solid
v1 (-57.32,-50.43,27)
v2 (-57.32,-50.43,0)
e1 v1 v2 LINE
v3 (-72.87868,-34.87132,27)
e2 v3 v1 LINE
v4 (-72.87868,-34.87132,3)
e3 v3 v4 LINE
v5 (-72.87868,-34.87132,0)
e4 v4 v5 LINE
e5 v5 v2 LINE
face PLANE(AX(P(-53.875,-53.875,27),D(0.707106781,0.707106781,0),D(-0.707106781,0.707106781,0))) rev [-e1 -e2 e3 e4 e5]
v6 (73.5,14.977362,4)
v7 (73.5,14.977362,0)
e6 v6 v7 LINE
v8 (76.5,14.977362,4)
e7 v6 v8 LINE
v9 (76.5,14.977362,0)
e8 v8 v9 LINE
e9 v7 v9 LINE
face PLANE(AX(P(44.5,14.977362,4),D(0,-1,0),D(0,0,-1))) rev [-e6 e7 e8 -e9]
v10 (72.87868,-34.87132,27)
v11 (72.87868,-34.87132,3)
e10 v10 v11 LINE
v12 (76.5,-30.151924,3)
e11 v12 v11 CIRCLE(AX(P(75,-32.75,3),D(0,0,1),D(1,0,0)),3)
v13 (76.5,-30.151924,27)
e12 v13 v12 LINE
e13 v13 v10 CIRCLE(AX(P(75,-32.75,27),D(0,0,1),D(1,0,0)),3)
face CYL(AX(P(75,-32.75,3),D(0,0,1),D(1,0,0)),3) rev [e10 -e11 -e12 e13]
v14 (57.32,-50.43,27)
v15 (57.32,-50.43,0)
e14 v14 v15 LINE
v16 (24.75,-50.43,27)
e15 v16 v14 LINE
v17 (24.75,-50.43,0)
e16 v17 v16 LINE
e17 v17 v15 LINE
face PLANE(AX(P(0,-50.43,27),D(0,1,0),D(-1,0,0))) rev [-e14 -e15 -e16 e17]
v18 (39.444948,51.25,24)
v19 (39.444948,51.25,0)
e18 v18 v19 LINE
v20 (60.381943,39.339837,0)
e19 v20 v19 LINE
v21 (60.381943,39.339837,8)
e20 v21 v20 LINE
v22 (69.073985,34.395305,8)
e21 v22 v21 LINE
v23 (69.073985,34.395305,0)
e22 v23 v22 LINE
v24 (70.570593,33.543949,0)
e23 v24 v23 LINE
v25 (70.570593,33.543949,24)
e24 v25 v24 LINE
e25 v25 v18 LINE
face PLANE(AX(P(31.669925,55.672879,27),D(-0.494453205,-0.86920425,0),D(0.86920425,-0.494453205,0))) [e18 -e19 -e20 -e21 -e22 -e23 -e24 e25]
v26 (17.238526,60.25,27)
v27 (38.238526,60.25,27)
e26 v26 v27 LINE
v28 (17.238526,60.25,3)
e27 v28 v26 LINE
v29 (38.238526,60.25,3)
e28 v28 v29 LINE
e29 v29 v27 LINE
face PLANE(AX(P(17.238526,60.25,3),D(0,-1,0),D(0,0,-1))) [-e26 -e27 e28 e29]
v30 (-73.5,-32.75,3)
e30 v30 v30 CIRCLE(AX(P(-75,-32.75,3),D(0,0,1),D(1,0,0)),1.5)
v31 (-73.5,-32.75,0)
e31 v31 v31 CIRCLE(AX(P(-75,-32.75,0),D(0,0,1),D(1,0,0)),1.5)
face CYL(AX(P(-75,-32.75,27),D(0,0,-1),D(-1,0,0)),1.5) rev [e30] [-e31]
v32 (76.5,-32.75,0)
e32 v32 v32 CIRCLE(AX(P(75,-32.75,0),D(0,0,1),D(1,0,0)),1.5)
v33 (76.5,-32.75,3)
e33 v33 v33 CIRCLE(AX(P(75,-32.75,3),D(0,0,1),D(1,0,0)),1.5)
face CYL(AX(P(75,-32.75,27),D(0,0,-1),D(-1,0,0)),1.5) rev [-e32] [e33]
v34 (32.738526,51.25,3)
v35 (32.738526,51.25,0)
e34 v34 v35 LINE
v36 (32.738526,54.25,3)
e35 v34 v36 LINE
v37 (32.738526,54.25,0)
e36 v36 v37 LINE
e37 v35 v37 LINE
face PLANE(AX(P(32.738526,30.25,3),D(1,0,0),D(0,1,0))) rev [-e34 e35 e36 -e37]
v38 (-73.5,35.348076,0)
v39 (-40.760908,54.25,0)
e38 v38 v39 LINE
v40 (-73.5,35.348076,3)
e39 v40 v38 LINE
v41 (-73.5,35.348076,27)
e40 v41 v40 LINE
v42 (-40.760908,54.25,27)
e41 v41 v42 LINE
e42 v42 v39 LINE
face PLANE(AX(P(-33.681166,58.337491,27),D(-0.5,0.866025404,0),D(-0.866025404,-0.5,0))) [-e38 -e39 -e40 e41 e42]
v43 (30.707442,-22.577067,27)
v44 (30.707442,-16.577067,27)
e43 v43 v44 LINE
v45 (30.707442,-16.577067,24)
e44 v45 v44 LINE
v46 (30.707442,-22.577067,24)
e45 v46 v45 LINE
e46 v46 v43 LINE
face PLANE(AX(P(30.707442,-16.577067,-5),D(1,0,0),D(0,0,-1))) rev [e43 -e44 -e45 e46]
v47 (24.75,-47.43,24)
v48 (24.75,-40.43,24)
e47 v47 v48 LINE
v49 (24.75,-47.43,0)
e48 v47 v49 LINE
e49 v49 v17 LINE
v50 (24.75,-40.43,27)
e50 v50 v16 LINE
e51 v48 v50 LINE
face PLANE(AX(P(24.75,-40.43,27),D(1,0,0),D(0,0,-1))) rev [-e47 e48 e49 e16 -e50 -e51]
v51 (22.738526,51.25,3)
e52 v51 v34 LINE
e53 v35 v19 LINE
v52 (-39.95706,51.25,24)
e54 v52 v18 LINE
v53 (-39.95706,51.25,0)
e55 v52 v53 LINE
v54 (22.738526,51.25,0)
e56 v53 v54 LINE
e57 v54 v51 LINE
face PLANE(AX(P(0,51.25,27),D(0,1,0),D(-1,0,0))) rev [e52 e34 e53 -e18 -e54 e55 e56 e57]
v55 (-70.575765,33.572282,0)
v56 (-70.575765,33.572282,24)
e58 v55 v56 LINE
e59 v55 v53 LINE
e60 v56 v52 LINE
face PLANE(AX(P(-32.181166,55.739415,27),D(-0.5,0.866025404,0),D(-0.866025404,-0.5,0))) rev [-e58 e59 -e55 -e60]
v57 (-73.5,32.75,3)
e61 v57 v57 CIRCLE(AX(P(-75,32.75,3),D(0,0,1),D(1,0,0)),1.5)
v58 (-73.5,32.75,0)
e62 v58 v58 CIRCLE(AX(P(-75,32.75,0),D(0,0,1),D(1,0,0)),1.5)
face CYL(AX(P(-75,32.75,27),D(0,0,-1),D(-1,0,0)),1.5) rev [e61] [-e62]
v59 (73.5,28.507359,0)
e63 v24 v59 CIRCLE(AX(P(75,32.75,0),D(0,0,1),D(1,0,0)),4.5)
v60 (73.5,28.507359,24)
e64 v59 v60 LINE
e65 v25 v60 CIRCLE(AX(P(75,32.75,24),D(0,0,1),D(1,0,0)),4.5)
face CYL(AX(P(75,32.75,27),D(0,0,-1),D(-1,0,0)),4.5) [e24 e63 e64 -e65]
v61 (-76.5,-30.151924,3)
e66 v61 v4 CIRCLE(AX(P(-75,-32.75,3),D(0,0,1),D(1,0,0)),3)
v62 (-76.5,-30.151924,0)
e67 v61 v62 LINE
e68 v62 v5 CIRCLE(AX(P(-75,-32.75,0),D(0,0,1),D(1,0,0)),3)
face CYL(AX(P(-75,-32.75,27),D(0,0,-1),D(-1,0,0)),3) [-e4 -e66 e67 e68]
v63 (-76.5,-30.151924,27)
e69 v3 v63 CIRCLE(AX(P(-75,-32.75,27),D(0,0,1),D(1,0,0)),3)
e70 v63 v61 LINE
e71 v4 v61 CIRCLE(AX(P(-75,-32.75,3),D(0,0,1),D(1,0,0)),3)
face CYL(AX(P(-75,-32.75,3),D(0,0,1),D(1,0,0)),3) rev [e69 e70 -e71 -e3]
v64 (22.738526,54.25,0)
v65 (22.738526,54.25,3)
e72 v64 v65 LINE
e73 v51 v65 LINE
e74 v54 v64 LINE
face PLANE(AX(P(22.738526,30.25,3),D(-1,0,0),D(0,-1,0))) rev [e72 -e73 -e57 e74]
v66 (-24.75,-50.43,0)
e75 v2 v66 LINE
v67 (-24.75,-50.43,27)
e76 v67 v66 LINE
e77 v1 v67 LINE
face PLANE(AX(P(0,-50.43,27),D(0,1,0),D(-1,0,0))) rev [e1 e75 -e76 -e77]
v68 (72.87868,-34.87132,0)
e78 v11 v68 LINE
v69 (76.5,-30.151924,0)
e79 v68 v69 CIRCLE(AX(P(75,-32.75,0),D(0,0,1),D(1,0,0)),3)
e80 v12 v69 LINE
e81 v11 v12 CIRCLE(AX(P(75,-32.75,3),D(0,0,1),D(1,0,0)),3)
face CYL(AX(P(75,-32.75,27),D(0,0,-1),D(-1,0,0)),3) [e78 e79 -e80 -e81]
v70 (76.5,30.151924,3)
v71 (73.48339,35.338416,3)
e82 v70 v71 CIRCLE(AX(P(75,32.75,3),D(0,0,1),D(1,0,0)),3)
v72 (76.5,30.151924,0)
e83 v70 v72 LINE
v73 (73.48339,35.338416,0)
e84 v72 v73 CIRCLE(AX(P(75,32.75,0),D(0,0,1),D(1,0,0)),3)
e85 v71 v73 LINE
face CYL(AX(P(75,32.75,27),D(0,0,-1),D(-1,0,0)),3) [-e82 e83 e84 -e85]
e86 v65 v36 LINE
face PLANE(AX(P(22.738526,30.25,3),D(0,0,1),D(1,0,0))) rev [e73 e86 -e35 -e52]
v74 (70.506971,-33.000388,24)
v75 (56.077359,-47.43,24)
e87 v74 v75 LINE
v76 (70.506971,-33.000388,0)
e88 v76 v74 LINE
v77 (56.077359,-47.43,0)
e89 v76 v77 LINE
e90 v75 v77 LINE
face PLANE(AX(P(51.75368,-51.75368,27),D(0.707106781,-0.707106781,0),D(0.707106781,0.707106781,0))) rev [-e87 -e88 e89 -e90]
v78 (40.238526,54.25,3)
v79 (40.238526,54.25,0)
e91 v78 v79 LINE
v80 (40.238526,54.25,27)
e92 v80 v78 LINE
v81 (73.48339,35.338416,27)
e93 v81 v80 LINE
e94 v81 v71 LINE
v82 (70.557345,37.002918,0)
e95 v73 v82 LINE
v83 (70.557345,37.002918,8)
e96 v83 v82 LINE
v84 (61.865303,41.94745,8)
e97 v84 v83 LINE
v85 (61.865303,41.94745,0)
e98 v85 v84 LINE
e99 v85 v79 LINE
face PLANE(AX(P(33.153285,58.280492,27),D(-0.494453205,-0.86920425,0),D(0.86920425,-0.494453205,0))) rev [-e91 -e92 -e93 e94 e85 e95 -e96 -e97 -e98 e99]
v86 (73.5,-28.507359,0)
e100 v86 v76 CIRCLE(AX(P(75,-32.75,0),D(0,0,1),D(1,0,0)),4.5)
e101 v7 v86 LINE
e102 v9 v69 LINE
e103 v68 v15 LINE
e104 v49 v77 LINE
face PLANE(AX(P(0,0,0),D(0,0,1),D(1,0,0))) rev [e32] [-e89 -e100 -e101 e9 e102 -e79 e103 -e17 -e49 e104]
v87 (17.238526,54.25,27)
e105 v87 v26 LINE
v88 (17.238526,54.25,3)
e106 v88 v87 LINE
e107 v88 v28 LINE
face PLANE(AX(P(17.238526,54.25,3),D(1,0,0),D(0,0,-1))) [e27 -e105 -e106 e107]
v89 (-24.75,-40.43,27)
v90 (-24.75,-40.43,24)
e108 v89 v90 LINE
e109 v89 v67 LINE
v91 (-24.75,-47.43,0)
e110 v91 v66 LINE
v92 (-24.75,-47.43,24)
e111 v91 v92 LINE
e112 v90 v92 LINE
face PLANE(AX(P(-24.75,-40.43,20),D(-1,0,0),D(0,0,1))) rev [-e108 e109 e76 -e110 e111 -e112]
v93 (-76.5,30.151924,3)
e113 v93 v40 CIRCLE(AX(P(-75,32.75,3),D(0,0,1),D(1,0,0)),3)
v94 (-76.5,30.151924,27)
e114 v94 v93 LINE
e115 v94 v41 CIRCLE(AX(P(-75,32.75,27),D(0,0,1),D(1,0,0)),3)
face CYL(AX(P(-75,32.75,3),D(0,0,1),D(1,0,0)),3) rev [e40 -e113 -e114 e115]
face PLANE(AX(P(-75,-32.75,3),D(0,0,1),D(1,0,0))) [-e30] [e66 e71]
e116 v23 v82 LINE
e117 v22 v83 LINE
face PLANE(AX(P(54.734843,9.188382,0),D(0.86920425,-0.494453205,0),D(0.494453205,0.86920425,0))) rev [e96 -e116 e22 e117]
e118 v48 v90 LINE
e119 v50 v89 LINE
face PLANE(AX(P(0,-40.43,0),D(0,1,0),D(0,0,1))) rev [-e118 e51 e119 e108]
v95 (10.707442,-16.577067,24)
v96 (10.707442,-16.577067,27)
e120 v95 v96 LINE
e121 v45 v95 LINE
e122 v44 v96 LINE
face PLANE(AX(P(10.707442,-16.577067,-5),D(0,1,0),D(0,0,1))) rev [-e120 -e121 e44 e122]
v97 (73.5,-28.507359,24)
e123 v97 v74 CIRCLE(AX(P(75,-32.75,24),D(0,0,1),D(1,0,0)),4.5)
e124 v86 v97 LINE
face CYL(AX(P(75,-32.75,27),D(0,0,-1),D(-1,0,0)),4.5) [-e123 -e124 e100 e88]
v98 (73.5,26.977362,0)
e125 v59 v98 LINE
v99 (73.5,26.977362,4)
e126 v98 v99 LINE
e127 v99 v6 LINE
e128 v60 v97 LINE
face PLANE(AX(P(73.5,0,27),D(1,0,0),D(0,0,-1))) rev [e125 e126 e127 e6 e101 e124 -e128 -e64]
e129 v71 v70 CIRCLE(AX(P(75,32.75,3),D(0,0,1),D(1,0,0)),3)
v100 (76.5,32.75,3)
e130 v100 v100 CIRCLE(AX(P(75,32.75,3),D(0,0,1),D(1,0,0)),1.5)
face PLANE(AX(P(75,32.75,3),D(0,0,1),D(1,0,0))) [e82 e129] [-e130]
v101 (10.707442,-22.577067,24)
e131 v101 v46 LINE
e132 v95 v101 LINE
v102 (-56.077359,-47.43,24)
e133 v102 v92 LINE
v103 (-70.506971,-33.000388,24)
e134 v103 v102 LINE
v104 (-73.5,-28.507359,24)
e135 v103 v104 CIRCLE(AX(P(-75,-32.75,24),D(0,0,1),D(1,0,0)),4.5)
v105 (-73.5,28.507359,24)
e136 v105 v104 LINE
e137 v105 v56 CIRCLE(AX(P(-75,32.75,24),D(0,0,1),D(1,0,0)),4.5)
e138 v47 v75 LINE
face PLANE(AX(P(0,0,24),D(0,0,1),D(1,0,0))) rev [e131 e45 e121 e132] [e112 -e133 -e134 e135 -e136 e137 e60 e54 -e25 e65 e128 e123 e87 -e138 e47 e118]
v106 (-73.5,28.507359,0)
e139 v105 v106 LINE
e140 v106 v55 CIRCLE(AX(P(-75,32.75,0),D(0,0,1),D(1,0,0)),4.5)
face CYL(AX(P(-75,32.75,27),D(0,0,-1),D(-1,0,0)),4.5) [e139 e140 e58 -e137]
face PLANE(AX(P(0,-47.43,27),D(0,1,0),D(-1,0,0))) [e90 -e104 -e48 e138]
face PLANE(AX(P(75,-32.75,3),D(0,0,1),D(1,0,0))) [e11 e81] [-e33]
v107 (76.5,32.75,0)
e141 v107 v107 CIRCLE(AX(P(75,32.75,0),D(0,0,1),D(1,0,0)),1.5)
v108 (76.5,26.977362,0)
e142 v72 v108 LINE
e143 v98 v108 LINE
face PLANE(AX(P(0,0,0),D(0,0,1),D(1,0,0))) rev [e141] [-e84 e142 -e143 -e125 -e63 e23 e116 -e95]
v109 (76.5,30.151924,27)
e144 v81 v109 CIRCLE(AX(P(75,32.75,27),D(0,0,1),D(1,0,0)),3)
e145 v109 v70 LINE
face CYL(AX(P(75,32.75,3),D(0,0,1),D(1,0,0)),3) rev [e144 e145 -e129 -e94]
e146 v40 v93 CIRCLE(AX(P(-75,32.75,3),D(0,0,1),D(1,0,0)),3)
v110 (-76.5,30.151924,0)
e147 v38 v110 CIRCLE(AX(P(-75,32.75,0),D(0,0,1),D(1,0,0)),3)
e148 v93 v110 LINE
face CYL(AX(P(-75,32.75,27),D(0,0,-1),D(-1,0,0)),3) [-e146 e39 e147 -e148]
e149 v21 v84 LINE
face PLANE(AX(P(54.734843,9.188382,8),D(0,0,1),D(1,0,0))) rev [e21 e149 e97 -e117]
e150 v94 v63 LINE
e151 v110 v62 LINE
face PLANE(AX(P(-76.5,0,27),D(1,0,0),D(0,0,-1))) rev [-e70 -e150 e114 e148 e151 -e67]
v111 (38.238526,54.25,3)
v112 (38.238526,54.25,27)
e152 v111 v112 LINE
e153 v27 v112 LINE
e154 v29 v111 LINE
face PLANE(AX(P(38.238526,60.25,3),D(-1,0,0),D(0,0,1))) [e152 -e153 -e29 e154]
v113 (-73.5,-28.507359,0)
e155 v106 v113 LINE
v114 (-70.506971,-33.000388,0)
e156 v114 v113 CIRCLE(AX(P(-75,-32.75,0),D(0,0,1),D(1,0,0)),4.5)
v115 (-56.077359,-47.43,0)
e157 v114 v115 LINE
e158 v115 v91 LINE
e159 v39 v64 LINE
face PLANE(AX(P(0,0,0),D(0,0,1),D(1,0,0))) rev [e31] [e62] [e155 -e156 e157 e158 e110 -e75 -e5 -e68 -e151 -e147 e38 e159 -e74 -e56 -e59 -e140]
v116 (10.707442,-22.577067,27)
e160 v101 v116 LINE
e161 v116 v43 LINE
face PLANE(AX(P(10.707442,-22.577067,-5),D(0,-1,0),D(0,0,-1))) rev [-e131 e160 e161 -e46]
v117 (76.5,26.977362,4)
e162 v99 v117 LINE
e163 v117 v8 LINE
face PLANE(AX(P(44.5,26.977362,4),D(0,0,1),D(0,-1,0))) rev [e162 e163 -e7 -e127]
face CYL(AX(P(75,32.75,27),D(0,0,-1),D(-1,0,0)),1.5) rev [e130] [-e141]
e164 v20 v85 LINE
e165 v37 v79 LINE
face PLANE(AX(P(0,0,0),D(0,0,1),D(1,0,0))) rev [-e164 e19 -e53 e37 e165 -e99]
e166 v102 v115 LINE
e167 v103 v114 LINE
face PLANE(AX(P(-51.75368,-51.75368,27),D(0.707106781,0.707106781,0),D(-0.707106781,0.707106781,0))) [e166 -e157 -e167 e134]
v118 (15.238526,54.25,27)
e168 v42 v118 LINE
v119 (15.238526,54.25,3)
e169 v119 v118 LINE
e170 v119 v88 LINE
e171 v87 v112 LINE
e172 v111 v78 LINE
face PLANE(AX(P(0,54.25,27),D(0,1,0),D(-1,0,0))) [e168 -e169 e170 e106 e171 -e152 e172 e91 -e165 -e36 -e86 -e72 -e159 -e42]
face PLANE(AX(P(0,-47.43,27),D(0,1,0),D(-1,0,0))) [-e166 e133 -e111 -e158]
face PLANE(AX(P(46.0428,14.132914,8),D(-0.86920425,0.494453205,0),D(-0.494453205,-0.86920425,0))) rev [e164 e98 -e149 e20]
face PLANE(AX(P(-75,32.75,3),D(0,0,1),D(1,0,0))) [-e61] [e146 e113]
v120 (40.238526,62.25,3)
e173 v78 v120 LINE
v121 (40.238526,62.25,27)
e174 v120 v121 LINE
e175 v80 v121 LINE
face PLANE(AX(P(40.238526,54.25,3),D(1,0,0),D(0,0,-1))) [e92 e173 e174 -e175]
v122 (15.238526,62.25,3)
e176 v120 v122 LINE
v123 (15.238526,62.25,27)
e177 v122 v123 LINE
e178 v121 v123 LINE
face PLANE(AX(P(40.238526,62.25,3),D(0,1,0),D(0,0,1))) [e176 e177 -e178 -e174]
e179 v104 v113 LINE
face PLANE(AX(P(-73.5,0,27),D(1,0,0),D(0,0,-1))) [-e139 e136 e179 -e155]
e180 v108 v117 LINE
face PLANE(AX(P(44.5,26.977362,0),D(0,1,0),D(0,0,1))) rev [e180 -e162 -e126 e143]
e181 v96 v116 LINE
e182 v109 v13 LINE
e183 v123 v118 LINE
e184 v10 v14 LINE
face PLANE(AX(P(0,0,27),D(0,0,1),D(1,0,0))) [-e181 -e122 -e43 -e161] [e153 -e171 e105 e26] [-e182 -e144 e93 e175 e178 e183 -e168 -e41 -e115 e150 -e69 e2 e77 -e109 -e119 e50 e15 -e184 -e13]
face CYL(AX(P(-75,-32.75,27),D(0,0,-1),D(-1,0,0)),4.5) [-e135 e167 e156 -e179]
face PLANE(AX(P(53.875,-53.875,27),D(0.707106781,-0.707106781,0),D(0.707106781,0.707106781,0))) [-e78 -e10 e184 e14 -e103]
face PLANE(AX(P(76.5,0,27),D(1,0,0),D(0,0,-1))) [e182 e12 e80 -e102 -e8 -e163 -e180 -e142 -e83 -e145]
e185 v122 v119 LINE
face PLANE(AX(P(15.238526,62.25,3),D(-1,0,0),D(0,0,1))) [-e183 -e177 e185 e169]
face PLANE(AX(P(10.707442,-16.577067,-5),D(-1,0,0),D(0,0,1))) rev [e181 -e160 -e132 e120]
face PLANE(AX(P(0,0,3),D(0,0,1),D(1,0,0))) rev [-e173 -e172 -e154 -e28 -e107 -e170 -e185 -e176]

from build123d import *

# Parameters (mm, degrees)
SKETCH_2_R          = 1.5
EXTRUDE_1_DEPTH     = 27
SHELL_1_DEPTH       = 24
CUT_EXTRUDE_START   = -24
SKETCH_3_R          = 3
CUT_EXTRUDE_1_DEPTH = 24
SKETCH_5_W          = 20
SKETCH_5_H          = 6
CUT_EXTRUDE_3_DEPTH = 32
SKETCH_6_W          = 4
SKETCH_6_H          = 12
CUT_EXTRUDE_4_DEPTH = 32
SKETCH_7_W          = 10
SKETCH_7_H          = 8
CUT_EXTRUDE_5_DEPTH = 32
EXTRUDE_2_DEPTH     = 24
SKETCH_9_W          = 10
SKETCH_9_H          = 3
CUT_EXTRUDE_6_DEPTH = 24
SKETCH_10_R         = 1.35
CUT_EXTRUDE_7_DEPTH = 10
CUT_EXTRUDE_8_DEPTH = 10
CUT_EXTRUDE_9_DEPTH = 10


# Read off the part's stored shape, not the designer's step: 抽壳1
with BuildPart() as part:
    # 草图2 → 凸台-拉伸1 (new body)
    with BuildSketch(Plane.XY):
        with BuildLine():
            Line((-76.5, 30.151923789), (-76.5, -30.151923789))
            ThreePointArc((-76.5, -30.151923789), (-77.380060021, -34.576284287), (-72.878679656, -34.871320344))
            Line((-72.878679656, -34.871320344), (-57.32, -50.43))
            Line((-57.32, -50.43), (57.32, -50.43))
            Line((57.32, -50.43), (72.878679656, -34.871320344))
            ThreePointArc((72.878679656, -34.871320344), (77.380060021, -34.576284287), (76.5, -30.151923789))
            Line((76.5, -30.151923789), (76.5, 30.151923789))
            ThreePointArc((76.5, 30.151923789), (77.593259199, 34.258312544), (73.483390382, 35.33841559))
            Line((73.483390382, 35.33841559), (40.238526366, 54.25))
            Line((40.238526366, 54.25), (-40.760907637, 54.25))
            Line((-40.760907637, 54.25), (-73.5, 35.348076211))
            ThreePointArc((-73.5, 35.348076211), (-77.598076211, 34.25), (-76.5, 30.151923789))
        make_face()
        with Locations((-75, 32.75)):
            Circle(SKETCH_2_R, mode=Mode.SUBTRACT)
        with Locations((75, 32.75)):
            Circle(SKETCH_2_R, mode=Mode.SUBTRACT)
        with Locations((75, -32.75)):
            Circle(SKETCH_2_R, mode=Mode.SUBTRACT)
        with Locations((-75, -32.75)):
            Circle(SKETCH_2_R, mode=Mode.SUBTRACT)
    extrude(amount=EXTRUDE_1_DEPTH)

    # 抽壳1 outline → 抽壳1 (cut)
    with BuildSketch(Plane.XY):
        with BuildLine():
            Line((-73.5, 28.507359313), (-73.5, -28.507359313))
            ThreePointArc((-73.5, -28.507359313), (-71.254879923, -30.255190266), (-70.506971411, -33.000387902))
            Line((-70.506971411, -33.000387902), (-56.077359313, -47.43))
            Line((-56.077359313, -47.43), (56.077359313, -47.43))
            Line((56.077359313, -47.43), (70.506971411, -33.000387902))
            ThreePointArc((70.506971411, -33.000387902), (71.254879923, -30.255190266), (73.5, -28.507359313))
            Line((73.5, -28.507359313), (73.5, 28.507359313))
            ThreePointArc((73.5, 28.507359313), (71.110106029, 30.48754008), (70.570593139, 33.543948905))
            Line((70.570593139, 33.543948905), (39.444948236, 51.25))
            Line((39.444948236, 51.25), (-39.95706006, 51.25))
            Line((-39.95706006, 51.25), (-70.575765386, 33.572282238))
            ThreePointArc((-70.575765386, 33.572282238), (-71.102885683, 30.5), (-73.5, 28.507359313))
        make_face()
    extrude(amount=SHELL_1_DEPTH, mode=Mode.SUBTRACT)

    # 草图3 → 切除-拉伸1 (cut)
    with BuildSketch(Plane.XY.offset(27).offset(CUT_EXTRUDE_START)):
        with Locations((75, 32.75)):
            Circle(SKETCH_3_R)
        with Locations((75, -32.75)):
            Circle(SKETCH_3_R)
        with Locations((-75, -32.75)):
            Circle(SKETCH_3_R)
        with Locations((-75, 32.75)):
            Circle(SKETCH_3_R)
    extrude(amount=CUT_EXTRUDE_1_DEPTH, mode=Mode.SUBTRACT)

    # 草图5 → 切除-拉伸3 (cut)
    with BuildSketch(Plane.XY.offset(27)):
        with Locations((20.7074416, -19.577067137)):
            Rectangle(SKETCH_5_W, SKETCH_5_H)
    extrude(amount=-CUT_EXTRUDE_3_DEPTH, mode=Mode.SUBTRACT)

    # 草图6 → 切除-拉伸4 (cut)
    with BuildSketch(Plane(origin=(76.5, 0, 0), x_dir=(0, 0, -1), z_dir=(1, 0, 0))):
        with Locations((-2, 20.977362477)):
            Rectangle(SKETCH_6_W, SKETCH_6_H)
    extrude(amount=-CUT_EXTRUDE_4_DEPTH, mode=Mode.SUBTRACT)

    # 草图7 → 切除-拉伸5 (cut)
    with BuildSketch(Plane(origin=(33.153284591, 58.280491682, 0), x_dir=(0.8692042501767389, -0.4944532045347601, 0), z_dir=(0.4944532045347601, 0.8692042501767389, 0))):
        with Locations((38.03253292, -4)):
            Rectangle(SKETCH_7_W, SKETCH_7_H)
    extrude(amount=-CUT_EXTRUDE_5_DEPTH, mode=Mode.SUBTRACT)

    # 草图8 → 凸台-拉伸2 (add)
    with BuildSketch(Plane.XY.offset(27)):
        Polygon((40.238526366, 54.25), (40.238526366, 62.25), (15.238526366, 62.25), (15.238526366, 54.25), (17.238526366, 54.25), (17.238526366, 60.25), (38.238526366, 60.25), (38.238526366, 54.25), align=None)
    extrude(amount=-EXTRUDE_2_DEPTH)

    # 草图9 → 切除-拉伸6 (cut)
    with BuildSketch(Plane(origin=(0, 54.25, 0), x_dir=(1, 0, 0), z_dir=(0, 1, 0))):
        with Locations((27.738526366, -1.5)):
            Rectangle(SKETCH_9_W, SKETCH_9_H)
    extrude(amount=-CUT_EXTRUDE_6_DEPTH, mode=Mode.SUBTRACT)

    # 草图10 → 切除-拉伸7 (cut)
    with BuildSketch(Plane.XZ.offset(50.43)):
        with Locations((-18.75, 20)):
            Circle(SKETCH_10_R)
        with Locations((18.75, 20)):
            Circle(SKETCH_10_R)
    extrude(amount=-CUT_EXTRUDE_7_DEPTH, mode=Mode.SUBTRACT)

    # 草图11 → 切除-拉伸8 (cut)
    with BuildSketch(Plane.XZ.offset(50.43)):
        Polygon((0, 3), (2, 3), (2, 0), (-2, 0), (-2, 3), align=None)
    extrude(amount=-CUT_EXTRUDE_8_DEPTH, mode=Mode.SUBTRACT)

    # 草图12 → 切除-拉伸9 (cut)
    with BuildSketch(Plane.XZ.offset(50.43)):
        Polygon((-24.75, 20), (-24.75, 27), (24.75, 27), (24.75, 20), (24.75, 0), (-24.75, 0), align=None)
    extrude(amount=-CUT_EXTRUDE_9_DEPTH, mode=Mode.SUBTRACT)


solid = part.part
